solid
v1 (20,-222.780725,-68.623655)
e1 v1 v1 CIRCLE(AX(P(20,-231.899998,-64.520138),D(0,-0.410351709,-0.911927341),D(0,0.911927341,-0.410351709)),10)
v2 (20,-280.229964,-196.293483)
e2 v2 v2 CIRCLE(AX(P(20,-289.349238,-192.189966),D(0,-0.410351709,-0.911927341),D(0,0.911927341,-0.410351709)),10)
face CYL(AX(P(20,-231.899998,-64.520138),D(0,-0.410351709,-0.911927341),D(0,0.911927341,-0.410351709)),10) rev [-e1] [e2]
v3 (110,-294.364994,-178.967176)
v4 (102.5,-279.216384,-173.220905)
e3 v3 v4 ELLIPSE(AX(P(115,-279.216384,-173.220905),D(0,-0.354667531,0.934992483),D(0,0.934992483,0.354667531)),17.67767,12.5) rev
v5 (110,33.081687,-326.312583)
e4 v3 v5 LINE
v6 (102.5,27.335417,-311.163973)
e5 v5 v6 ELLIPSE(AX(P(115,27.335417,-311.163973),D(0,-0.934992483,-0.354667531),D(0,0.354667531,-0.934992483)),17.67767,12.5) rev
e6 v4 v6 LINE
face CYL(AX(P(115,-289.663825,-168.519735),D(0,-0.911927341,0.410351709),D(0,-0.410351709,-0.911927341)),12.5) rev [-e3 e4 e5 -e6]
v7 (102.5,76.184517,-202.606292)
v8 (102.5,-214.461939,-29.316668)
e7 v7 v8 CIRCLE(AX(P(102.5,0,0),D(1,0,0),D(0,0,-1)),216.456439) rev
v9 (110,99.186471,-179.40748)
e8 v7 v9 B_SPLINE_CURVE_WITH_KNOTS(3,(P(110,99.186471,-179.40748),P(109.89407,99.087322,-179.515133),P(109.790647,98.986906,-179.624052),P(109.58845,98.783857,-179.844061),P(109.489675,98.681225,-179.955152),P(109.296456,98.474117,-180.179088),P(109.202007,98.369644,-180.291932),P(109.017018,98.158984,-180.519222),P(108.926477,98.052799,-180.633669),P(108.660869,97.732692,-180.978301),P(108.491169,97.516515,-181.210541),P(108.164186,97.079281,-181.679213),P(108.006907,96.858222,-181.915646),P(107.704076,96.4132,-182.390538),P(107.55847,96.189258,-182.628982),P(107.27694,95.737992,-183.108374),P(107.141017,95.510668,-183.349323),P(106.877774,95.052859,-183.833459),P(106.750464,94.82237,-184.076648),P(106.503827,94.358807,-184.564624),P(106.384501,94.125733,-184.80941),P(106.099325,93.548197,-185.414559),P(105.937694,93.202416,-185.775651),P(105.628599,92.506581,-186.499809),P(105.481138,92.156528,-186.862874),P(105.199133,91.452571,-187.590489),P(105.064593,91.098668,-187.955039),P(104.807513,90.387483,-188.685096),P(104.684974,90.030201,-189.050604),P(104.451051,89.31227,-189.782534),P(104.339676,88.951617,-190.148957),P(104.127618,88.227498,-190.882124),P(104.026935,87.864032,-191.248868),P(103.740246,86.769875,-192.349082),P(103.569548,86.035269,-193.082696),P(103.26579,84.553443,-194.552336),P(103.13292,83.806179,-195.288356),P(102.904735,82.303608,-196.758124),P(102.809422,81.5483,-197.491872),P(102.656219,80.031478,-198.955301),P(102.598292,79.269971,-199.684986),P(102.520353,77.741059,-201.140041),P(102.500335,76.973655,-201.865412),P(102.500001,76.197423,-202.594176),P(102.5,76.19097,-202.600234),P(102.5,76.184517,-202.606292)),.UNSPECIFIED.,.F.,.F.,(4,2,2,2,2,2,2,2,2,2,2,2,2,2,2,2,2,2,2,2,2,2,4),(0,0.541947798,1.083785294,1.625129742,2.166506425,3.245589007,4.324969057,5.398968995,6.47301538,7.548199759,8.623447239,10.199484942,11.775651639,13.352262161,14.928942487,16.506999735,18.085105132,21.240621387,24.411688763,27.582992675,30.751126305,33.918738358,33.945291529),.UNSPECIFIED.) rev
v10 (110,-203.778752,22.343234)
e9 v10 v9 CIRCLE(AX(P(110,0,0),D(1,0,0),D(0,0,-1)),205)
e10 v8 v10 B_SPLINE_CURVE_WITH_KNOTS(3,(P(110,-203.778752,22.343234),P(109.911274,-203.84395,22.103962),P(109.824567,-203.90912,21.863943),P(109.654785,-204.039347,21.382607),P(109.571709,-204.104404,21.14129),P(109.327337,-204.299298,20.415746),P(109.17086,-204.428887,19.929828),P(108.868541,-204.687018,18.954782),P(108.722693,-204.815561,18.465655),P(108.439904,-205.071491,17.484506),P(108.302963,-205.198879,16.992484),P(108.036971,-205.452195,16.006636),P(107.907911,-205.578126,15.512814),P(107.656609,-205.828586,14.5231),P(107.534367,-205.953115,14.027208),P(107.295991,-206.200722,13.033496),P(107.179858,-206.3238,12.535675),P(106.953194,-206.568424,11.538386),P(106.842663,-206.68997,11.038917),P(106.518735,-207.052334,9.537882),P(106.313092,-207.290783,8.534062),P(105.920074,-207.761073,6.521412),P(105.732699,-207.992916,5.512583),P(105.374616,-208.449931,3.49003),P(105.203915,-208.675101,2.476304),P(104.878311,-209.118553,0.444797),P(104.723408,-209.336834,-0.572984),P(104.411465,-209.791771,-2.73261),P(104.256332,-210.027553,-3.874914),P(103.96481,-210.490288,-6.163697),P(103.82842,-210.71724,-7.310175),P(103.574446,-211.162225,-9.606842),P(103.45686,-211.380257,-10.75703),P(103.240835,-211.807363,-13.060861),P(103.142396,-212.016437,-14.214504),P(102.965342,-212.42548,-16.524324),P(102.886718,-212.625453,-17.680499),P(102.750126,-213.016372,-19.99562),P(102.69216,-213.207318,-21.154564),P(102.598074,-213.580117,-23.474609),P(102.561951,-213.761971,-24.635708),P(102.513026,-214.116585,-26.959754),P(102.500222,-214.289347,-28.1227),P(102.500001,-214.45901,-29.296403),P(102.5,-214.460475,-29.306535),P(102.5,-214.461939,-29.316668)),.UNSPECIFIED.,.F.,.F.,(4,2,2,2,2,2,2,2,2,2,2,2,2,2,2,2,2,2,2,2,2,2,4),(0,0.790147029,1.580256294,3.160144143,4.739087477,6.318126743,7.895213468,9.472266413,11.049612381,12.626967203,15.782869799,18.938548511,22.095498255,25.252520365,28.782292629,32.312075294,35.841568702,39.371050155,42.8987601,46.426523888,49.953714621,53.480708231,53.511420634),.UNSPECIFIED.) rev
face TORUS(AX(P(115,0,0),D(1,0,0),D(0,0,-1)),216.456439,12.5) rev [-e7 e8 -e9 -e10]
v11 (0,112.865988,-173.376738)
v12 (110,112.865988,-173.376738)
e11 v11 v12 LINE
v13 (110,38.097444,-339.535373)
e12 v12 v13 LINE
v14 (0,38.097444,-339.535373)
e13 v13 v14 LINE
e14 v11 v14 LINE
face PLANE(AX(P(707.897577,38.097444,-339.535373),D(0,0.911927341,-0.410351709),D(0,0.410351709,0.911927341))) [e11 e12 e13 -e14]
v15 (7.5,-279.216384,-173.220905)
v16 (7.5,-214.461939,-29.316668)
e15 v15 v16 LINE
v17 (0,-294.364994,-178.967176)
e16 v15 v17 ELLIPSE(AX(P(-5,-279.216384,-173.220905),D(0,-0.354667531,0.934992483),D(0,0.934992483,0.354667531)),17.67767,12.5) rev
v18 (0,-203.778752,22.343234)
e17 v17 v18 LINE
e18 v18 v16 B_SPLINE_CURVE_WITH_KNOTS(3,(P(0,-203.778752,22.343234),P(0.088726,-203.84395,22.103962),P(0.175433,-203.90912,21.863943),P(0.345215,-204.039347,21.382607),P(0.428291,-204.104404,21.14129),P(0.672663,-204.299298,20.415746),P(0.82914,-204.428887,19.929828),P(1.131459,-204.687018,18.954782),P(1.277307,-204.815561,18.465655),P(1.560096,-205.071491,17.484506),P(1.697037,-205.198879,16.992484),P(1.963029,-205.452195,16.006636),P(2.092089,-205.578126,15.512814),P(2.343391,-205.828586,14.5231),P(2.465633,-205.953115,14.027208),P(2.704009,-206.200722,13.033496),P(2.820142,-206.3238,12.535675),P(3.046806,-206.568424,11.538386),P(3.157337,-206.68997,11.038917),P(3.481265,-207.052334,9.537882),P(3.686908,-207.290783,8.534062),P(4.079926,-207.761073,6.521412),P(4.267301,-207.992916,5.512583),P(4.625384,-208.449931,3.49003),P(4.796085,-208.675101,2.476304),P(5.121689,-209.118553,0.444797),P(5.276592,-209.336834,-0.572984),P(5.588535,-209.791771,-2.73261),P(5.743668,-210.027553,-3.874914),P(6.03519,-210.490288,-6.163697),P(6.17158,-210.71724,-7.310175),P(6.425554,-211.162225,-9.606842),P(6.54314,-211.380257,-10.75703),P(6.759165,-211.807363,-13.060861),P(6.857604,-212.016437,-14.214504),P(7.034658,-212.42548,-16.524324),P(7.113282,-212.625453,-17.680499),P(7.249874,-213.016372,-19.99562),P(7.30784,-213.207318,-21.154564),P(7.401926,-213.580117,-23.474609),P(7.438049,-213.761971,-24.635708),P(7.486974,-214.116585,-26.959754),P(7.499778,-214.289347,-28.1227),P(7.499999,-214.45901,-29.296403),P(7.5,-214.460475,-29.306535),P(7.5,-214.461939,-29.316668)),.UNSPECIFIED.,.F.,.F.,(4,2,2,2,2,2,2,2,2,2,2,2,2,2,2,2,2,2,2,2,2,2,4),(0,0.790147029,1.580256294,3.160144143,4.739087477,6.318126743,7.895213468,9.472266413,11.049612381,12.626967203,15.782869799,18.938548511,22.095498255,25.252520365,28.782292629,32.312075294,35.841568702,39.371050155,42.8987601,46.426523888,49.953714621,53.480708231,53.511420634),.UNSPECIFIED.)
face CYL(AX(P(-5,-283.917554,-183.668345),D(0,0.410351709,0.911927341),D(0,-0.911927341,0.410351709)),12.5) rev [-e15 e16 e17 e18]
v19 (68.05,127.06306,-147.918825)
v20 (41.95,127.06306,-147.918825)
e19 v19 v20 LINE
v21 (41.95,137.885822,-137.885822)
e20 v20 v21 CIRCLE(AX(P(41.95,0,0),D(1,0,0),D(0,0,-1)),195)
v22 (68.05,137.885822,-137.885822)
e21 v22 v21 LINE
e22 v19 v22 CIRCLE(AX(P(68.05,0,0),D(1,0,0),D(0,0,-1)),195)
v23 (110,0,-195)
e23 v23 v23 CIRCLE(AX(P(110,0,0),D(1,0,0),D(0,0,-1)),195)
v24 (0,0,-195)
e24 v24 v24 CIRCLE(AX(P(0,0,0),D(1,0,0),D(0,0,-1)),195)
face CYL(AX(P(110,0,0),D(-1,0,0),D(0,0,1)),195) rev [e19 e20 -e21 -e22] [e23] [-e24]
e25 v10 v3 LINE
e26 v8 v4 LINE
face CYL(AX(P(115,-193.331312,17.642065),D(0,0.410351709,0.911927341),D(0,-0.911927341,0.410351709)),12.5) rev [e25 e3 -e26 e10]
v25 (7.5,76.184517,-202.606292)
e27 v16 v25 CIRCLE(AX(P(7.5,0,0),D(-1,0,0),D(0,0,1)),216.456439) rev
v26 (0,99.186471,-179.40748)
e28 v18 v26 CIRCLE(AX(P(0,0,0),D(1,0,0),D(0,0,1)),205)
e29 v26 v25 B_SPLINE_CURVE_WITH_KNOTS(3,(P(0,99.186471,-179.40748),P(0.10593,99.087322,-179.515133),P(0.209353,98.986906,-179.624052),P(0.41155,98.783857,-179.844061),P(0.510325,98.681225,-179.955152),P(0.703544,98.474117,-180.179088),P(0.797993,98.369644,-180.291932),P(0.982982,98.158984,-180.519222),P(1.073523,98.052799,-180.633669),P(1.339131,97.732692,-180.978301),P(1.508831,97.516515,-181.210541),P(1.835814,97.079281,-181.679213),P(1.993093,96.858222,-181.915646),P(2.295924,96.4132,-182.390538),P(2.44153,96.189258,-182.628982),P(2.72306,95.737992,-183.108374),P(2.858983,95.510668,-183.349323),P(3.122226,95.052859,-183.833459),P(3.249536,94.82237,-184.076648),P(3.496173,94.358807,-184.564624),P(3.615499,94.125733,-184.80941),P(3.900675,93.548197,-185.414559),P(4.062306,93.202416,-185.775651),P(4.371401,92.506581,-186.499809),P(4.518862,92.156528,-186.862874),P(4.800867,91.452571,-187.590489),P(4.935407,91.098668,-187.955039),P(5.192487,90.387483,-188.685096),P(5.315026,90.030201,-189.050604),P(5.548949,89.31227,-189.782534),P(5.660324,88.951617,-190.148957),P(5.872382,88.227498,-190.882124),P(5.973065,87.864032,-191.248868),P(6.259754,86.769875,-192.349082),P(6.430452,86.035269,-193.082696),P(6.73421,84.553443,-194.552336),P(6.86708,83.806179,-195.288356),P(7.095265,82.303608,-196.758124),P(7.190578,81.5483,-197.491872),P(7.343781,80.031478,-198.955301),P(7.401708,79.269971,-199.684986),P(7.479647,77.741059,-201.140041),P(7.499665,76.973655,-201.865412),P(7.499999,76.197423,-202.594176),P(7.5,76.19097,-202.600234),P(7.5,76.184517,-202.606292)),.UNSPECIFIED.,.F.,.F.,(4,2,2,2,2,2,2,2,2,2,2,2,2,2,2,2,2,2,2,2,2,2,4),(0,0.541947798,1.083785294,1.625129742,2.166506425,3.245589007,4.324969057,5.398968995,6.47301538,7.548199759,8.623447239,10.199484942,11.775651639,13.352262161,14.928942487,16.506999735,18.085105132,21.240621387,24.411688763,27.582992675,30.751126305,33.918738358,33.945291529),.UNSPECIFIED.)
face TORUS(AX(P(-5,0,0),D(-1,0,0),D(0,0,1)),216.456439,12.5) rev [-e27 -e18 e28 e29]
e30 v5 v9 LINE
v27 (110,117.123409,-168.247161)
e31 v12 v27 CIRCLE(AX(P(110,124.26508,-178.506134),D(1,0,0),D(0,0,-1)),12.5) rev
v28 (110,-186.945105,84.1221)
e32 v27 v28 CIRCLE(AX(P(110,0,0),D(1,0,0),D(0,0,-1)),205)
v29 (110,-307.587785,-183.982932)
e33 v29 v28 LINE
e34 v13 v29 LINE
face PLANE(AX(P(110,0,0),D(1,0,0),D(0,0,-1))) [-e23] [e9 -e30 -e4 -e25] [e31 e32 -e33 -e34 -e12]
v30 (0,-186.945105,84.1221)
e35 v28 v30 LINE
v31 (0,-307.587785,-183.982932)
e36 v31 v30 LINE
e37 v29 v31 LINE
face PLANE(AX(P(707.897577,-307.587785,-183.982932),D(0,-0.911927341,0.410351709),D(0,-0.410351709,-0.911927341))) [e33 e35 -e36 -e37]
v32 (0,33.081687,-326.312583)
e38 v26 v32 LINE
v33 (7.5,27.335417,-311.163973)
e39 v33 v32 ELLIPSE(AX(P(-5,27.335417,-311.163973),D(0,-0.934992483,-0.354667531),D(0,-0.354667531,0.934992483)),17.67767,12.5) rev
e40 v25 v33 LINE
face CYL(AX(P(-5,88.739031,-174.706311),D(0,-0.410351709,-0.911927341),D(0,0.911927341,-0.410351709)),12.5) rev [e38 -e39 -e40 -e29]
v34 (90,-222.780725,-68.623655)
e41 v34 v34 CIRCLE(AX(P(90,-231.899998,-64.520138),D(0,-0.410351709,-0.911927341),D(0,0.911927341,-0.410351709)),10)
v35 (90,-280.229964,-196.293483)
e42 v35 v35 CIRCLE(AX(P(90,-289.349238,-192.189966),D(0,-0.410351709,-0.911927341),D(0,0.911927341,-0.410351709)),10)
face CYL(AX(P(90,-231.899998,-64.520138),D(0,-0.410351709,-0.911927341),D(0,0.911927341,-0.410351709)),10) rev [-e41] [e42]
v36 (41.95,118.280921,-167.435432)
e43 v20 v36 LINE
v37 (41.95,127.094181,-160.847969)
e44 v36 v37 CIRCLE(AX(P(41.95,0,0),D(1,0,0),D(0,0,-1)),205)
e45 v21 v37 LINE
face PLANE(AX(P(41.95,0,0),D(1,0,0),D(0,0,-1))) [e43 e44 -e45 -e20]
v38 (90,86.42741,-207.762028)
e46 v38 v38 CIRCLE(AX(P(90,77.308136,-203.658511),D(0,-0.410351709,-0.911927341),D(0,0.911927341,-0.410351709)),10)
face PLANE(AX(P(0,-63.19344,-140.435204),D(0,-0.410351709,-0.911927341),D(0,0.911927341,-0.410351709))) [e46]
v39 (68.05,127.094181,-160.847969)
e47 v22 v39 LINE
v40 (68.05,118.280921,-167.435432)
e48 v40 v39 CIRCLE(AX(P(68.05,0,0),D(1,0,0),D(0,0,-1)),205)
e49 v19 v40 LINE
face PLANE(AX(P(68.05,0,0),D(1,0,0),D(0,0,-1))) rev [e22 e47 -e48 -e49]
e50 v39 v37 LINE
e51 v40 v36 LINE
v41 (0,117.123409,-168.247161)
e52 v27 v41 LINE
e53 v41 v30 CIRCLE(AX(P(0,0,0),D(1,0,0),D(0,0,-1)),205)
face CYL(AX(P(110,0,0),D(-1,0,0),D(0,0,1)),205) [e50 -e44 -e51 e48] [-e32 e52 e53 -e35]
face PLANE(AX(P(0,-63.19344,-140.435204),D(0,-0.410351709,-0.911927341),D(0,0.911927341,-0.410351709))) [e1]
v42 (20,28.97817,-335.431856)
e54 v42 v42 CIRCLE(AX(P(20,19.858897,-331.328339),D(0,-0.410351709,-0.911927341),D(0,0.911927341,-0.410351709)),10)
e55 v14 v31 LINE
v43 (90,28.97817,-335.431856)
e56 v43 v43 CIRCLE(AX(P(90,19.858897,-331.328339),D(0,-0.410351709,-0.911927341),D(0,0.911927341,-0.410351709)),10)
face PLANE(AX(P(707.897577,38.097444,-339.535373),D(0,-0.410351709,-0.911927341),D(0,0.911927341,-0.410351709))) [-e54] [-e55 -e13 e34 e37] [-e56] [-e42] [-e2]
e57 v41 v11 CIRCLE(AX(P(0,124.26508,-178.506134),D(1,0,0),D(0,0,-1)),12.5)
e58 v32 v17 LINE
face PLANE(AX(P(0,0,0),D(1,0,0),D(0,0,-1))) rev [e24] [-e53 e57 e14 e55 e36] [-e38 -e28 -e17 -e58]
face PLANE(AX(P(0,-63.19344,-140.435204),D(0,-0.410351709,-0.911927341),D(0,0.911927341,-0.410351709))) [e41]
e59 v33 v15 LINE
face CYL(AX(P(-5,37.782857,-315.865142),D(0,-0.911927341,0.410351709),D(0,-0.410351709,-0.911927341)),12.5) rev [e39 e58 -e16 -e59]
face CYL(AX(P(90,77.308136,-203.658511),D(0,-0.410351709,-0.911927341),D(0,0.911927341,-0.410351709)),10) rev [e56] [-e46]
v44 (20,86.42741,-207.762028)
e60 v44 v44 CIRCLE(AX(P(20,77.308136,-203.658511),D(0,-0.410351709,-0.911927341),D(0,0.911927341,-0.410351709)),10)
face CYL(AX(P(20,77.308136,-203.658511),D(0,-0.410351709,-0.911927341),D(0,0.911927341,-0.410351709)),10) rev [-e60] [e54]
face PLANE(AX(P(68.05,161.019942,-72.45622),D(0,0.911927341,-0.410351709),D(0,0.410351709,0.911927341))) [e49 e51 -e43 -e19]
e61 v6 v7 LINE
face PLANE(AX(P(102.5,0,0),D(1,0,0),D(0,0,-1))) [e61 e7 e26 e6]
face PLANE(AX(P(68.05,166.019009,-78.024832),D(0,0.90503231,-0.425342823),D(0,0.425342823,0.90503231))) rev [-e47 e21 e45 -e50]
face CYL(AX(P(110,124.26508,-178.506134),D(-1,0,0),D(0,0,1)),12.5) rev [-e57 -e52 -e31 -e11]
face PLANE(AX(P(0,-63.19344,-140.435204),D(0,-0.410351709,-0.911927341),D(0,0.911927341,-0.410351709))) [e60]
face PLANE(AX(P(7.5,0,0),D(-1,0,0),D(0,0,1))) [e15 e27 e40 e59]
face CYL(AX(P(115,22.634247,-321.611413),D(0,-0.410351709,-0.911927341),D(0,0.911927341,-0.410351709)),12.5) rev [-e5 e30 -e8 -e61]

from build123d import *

# Parameters (mm, degrees)
SKETCH1_R           = 205
SKETCH1_R_2         = 195
BOSS_EXTRUDE1_DEPTH = 110
CUT_EXTRUDE1_START  = 41.95
CUT_EXTRUDE1_DEPTH  = 26.1
BOSS_EXTRUDE3_DEPTH = 110
SKETCH5_R           = 10
CUT_EXTRUDE2_DEPTH  = 140
FILLET1_R           = 12.5
CUT_EXTRUDE4_START  = -7.5
CUT_EXTRUDE4_DEPTH  = 7.5
CUT_EXTRUDE5_DEPTH  = 7.5
FILLET2_R           = 12.5


with BuildPart() as part:
    # Sketch1 → Boss-Extrude1 (new body)
    with BuildSketch(Plane(origin=(0, 0, 0), x_dir=(0, 0, -1), z_dir=(1, 0, 0))):
        Circle(SKETCH1_R)
        Circle(SKETCH1_R_2, mode=Mode.SUBTRACT)
    extrude(amount=BOSS_EXTRUDE1_DEPTH)

    # Sketch3 → Cut-Extrude1 (cut)
    with BuildSketch(Plane(origin=(0, 0, 0), x_dir=(0, 0, -1), z_dir=(1, 0, 0)).offset(CUT_EXTRUDE1_START)):
        with BuildLine():
            Line((160.8479694, 127.09418059), (137.885822331, 137.885822331))
            ThreePointArc((137.885822331, 137.885822331), (143.004745144, 132.569388874), (147.918824855, 127.063060145))
            Line((147.918824855, 127.063060145), (167.43543162, 118.280920855))
            ThreePointArc((167.43543162, 118.280920855), (164.200841146, 122.731755332), (160.8479694, 127.09418059))
        make_face()
    extrude(amount=CUT_EXTRUDE1_DEPTH, mode=Mode.SUBTRACT)

    # Sketch4 → Boss-Extrude3 (add)
    with BuildSketch(Plane.ZY):
        with BuildLine():
            Line((-339.535373084, 38.097443801), (-170.172659449, 114.307768661))
            ThreePointArc((-170.172659449, 114.307768661), (-156.650879802, -132.232756371), (84.122100255, -186.945104907))
            Line((84.122100255, -186.945104907), (-183.982931916, -307.587784512))
            Line((-183.982931916, -307.587784512), (-339.535373084, 38.097443801))
        make_face()
    extrude(amount=-BOSS_EXTRUDE3_DEPTH)

    # Sketch5 → Cut-Extrude2 (cut)
    with BuildSketch(Plane(origin=(0, -120.642679605, -268.105032171), x_dir=(-1, 0, 0), z_dir=(0, -0.41035170855993064, -0.9119273410102067))):
        with Locations(Location((-90, -185, 0), (0, 0, 90))):
            Circle(SKETCH5_R)
        with Locations(Location((-20, -185, 0), (0, 0, 90))):
            Circle(SKETCH5_R)
        with Locations(Location((-20, 154.071021086, 0), (0, 0, 90))):
            Circle(SKETCH5_R)
        with Locations(Location((-90, 154.071021086, 0), (0, 0, 90))):
            Circle(SKETCH5_R)
    extrude(amount=-CUT_EXTRUDE2_DEPTH, mode=Mode.SUBTRACT)

    # Fillet1
    fillet1_edges = [part.edges().sort_by_distance(p)[0] for p in [
        (55, 114.307768661, -170.172659449),
    ]]
    fillet(fillet1_edges, radius=FILLET1_R)

    # Sketch6 → Cut-Extrude4 (cut)
    with BuildSketch(Plane(origin=(110, 0, 0), x_dir=(0, 0, -1), z_dir=(1, 0, 0)).offset(CUT_EXTRUDE4_START)):
        with BuildLine():
            Line((326.312582588, 33.081687477), (179.407480032, 99.186471399))
            ThreePointArc((179.407480032, 99.186471399), (170.629059775, -113.625366712), (-22.343234006, -203.778752313))
            Line((-22.343234006, -203.778752313), (178.967175591, -294.364994017))
            Line((178.967175591, -294.364994017), (326.312582588, 33.081687477))
        make_face()
    extrude(amount=CUT_EXTRUDE4_DEPTH, mode=Mode.SUBTRACT)

    # Sketch7 → Cut-Extrude5 (cut)
    with BuildSketch(Plane.ZY):
        with BuildLine():
            Line((-179.407480032, 99.186471399), (-326.312582588, 33.081687477))
            Line((-326.312582588, 33.081687477), (-178.967175591, -294.364994017))
            Line((-178.967175591, -294.364994017), (22.343234006, -203.778752313))
            ThreePointArc((22.343234006, -203.778752313), (-170.629059775, -113.625366712), (-179.407480032, 99.186471399))
        make_face()
    extrude(amount=-CUT_EXTRUDE5_DEPTH, mode=Mode.SUBTRACT)

    # Fillet2
    # the kernel refuses this fillet: 12.5 mm, written as the material it adds along each edge
    with BuildSketch(Plane(origin=(102.5, -192.025828775, 48.461834434), x_dir=(1, 0, 0), z_dir=(0, -0.4103517085599303, -0.9119273410102069))) as fillet2_piece_1_section:
        with BuildLine():
            CenterArc((12.5, -11.456439237), FILLET2_R, 113.578178478, 66.421821522)
            Line((0, -11.456439237), (0, 0))
            Line((0, 0), (7.5, 0))
        make_face()
    fillet2_piece_1 = extrude(amount=249.39378369, mode=Mode.PRIVATE)
    fillet2_piece_1 = fillet2_piece_1 - Plane(origin=(104.520833168, 0, 0), x_dir=(0, 0.4838364458471492, -0.8751584391811569), z_dir=(-1, 0, 0)) * Cylinder(205, 545, mode=Mode.PRIVATE)
    add(fillet2_piece_1)
    with BuildSketch(Plane(origin=(102.5, 0, 0), x_dir=(0, 0.6010821181754732, -0.7991872666713895), z_dir=(0, 0.7991872666713895, 0.6010821181754732))) as fillet2_piece_2_section:
        with BuildLine():
            CenterArc((216.456439237, -12.5), FILLET2_R, 90, 66.421821522)
            Line((216.456439237, 0), (205, 0))
            Line((205, 0), (205, -7.5))
        make_face()
    fillet2_piece_2 = revolve(axis=Axis((102.5, 0, 0), (-1, 0, 0)), revolution_arc=141.215785086, mode=Mode.PRIVATE)
    fillet2_piece_2 = split(fillet2_piece_2, bisect_by=Plane(origin=(104.520833168, -262.670858667, -108.533087047), z_dir=(0, 0.9119273410102068, -0.41035170855993025)), keep=Keep.TOP, mode=Mode.PRIVATE)
    fillet2_piece_2 = split(fillet2_piece_2, bisect_by=Plane(origin=(104.520833168, 64.775822826, -255.878494044), z_dir=(0, -0.9119273410102069, 0.41035170855993014)), keep=Keep.TOP, mode=Mode.PRIVATE)
    add(fillet2_piece_2)
    with BuildSketch(Plane(origin=(102.5, 33.081687477, -326.312582588), x_dir=(1, 0, 0), z_dir=(0, 0.41035170855993014, 0.9119273410102069))) as fillet2_piece_3_section:
        with BuildLine():
            CenterArc((12.5, -11.456439237), FILLET2_R, 113.578178478, 66.421821522)
            Line((0, -11.456439237), (0, 0))
            Line((0, 0), (7.5, 0))
        make_face()
    fillet2_piece_3 = extrude(amount=189.734088675, mode=Mode.PRIVATE)
    fillet2_piece_3 = fillet2_piece_3 - Plane(origin=(104.520833168, 0, 0), x_dir=(0, 0.4838364458471492, -0.8751584391811569), z_dir=(-1, 0, 0)) * Cylinder(205, 426, mode=Mode.PRIVATE)
    add(fillet2_piece_3)
    with BuildSketch(Plane(origin=(102.5, -294.364994017, -178.967175591), x_dir=(1, 0, 0), z_dir=(0, 0.9119273410102068, -0.4103517085599305)), Plane(origin=(7.5, 33.081687477, -326.312582588), x_dir=(-1, 0, 0), z_dir=(0, -0.9119273410102068, 0.41035170855993064))) as fillet2_piece_4:
        with BuildLine():
            CenterArc((12.5, -11.456439237), FILLET2_R, 113.578178478, 66.421821522)
            Line((0, -11.456439237), (0, 0))
            Line((0, 0), (7.5, 0))
        make_face()
    extrude(amount=359.071021086)
    with BuildSketch(Plane(origin=(7.5, -294.364994017, -178.967175591), x_dir=(-1, 0, 0), z_dir=(0, 0.41035170855993075, 0.9119273410102067))) as fillet2_piece_5_section:
        with BuildLine():
            CenterArc((12.5, -11.456439237), FILLET2_R, 113.578178478, 66.421821522)
            Line((0, -11.456439237), (0, 0))
            Line((0, 0), (7.5, 0))
        make_face()
    fillet2_piece_5 = extrude(amount=249.39378369, mode=Mode.PRIVATE)
    fillet2_piece_5 = fillet2_piece_5 - Plane(origin=(5.479166832, 0, 0), x_dir=(0, 0, -1), z_dir=(-1, 0, 0)) * Cylinder(195, 545, mode=Mode.PRIVATE)
    add(fillet2_piece_5)
    with BuildSketch(Plane(origin=(7.5, 110.939394936, -153.288879604), x_dir=(-1, 0, 0), z_dir=(0, -0.4103517085599306, -0.9119273410102067))) as fillet2_piece_6_section:
        with BuildLine():
            CenterArc((12.5, -11.456439237), FILLET2_R, 113.578178478, 66.421821522)
            Line((0, -11.456439237), (0, 0))
            Line((0, 0), (7.5, 0))
        make_face()
    fillet2_piece_6 = extrude(amount=189.734088675, mode=Mode.PRIVATE)
    fillet2_piece_6 = fillet2_piece_6 - Plane(origin=(5.479166832, 0, 0), x_dir=(0, 0, -1), z_dir=(-1, 0, 0)) * Cylinder(195, 426, mode=Mode.PRIVATE)
    add(fillet2_piece_6)
    with BuildSketch(Plane(origin=(7.5, 0, 0), x_dir=(0, -0.9691520376470129, 0.24646364422495046), z_dir=(0, 0.24646364422495046, 0.9691520376470129))) as fillet2_piece_7_section:
        with BuildLine():
            CenterArc((216.456439237, -12.5), FILLET2_R, 90, 66.421821522)
            Line((216.456439237, 0), (205, 0))
            Line((205, 0), (205, -7.5))
        make_face()
    fillet2_piece_7 = revolve(axis=Axis((7.5, 0, 0), (1, 0, 0)), revolution_arc=141.215785086, mode=Mode.PRIVATE)
    fillet2_piece_7 = split(fillet2_piece_7, bisect_by=Plane(origin=(5.479166832, -262.670858667, -108.533087047), z_dir=(0, 0.9119273410102067, -0.41035170855993075)), keep=Keep.TOP, mode=Mode.PRIVATE)
    fillet2_piece_7 = split(fillet2_piece_7, bisect_by=Plane(origin=(5.479166832, 64.775822826, -255.878494044), z_dir=(0, -0.9119273410102067, 0.4103517085599306)), keep=Keep.TOP, mode=Mode.PRIVATE)
    add(fillet2_piece_7)


solid = part.part
